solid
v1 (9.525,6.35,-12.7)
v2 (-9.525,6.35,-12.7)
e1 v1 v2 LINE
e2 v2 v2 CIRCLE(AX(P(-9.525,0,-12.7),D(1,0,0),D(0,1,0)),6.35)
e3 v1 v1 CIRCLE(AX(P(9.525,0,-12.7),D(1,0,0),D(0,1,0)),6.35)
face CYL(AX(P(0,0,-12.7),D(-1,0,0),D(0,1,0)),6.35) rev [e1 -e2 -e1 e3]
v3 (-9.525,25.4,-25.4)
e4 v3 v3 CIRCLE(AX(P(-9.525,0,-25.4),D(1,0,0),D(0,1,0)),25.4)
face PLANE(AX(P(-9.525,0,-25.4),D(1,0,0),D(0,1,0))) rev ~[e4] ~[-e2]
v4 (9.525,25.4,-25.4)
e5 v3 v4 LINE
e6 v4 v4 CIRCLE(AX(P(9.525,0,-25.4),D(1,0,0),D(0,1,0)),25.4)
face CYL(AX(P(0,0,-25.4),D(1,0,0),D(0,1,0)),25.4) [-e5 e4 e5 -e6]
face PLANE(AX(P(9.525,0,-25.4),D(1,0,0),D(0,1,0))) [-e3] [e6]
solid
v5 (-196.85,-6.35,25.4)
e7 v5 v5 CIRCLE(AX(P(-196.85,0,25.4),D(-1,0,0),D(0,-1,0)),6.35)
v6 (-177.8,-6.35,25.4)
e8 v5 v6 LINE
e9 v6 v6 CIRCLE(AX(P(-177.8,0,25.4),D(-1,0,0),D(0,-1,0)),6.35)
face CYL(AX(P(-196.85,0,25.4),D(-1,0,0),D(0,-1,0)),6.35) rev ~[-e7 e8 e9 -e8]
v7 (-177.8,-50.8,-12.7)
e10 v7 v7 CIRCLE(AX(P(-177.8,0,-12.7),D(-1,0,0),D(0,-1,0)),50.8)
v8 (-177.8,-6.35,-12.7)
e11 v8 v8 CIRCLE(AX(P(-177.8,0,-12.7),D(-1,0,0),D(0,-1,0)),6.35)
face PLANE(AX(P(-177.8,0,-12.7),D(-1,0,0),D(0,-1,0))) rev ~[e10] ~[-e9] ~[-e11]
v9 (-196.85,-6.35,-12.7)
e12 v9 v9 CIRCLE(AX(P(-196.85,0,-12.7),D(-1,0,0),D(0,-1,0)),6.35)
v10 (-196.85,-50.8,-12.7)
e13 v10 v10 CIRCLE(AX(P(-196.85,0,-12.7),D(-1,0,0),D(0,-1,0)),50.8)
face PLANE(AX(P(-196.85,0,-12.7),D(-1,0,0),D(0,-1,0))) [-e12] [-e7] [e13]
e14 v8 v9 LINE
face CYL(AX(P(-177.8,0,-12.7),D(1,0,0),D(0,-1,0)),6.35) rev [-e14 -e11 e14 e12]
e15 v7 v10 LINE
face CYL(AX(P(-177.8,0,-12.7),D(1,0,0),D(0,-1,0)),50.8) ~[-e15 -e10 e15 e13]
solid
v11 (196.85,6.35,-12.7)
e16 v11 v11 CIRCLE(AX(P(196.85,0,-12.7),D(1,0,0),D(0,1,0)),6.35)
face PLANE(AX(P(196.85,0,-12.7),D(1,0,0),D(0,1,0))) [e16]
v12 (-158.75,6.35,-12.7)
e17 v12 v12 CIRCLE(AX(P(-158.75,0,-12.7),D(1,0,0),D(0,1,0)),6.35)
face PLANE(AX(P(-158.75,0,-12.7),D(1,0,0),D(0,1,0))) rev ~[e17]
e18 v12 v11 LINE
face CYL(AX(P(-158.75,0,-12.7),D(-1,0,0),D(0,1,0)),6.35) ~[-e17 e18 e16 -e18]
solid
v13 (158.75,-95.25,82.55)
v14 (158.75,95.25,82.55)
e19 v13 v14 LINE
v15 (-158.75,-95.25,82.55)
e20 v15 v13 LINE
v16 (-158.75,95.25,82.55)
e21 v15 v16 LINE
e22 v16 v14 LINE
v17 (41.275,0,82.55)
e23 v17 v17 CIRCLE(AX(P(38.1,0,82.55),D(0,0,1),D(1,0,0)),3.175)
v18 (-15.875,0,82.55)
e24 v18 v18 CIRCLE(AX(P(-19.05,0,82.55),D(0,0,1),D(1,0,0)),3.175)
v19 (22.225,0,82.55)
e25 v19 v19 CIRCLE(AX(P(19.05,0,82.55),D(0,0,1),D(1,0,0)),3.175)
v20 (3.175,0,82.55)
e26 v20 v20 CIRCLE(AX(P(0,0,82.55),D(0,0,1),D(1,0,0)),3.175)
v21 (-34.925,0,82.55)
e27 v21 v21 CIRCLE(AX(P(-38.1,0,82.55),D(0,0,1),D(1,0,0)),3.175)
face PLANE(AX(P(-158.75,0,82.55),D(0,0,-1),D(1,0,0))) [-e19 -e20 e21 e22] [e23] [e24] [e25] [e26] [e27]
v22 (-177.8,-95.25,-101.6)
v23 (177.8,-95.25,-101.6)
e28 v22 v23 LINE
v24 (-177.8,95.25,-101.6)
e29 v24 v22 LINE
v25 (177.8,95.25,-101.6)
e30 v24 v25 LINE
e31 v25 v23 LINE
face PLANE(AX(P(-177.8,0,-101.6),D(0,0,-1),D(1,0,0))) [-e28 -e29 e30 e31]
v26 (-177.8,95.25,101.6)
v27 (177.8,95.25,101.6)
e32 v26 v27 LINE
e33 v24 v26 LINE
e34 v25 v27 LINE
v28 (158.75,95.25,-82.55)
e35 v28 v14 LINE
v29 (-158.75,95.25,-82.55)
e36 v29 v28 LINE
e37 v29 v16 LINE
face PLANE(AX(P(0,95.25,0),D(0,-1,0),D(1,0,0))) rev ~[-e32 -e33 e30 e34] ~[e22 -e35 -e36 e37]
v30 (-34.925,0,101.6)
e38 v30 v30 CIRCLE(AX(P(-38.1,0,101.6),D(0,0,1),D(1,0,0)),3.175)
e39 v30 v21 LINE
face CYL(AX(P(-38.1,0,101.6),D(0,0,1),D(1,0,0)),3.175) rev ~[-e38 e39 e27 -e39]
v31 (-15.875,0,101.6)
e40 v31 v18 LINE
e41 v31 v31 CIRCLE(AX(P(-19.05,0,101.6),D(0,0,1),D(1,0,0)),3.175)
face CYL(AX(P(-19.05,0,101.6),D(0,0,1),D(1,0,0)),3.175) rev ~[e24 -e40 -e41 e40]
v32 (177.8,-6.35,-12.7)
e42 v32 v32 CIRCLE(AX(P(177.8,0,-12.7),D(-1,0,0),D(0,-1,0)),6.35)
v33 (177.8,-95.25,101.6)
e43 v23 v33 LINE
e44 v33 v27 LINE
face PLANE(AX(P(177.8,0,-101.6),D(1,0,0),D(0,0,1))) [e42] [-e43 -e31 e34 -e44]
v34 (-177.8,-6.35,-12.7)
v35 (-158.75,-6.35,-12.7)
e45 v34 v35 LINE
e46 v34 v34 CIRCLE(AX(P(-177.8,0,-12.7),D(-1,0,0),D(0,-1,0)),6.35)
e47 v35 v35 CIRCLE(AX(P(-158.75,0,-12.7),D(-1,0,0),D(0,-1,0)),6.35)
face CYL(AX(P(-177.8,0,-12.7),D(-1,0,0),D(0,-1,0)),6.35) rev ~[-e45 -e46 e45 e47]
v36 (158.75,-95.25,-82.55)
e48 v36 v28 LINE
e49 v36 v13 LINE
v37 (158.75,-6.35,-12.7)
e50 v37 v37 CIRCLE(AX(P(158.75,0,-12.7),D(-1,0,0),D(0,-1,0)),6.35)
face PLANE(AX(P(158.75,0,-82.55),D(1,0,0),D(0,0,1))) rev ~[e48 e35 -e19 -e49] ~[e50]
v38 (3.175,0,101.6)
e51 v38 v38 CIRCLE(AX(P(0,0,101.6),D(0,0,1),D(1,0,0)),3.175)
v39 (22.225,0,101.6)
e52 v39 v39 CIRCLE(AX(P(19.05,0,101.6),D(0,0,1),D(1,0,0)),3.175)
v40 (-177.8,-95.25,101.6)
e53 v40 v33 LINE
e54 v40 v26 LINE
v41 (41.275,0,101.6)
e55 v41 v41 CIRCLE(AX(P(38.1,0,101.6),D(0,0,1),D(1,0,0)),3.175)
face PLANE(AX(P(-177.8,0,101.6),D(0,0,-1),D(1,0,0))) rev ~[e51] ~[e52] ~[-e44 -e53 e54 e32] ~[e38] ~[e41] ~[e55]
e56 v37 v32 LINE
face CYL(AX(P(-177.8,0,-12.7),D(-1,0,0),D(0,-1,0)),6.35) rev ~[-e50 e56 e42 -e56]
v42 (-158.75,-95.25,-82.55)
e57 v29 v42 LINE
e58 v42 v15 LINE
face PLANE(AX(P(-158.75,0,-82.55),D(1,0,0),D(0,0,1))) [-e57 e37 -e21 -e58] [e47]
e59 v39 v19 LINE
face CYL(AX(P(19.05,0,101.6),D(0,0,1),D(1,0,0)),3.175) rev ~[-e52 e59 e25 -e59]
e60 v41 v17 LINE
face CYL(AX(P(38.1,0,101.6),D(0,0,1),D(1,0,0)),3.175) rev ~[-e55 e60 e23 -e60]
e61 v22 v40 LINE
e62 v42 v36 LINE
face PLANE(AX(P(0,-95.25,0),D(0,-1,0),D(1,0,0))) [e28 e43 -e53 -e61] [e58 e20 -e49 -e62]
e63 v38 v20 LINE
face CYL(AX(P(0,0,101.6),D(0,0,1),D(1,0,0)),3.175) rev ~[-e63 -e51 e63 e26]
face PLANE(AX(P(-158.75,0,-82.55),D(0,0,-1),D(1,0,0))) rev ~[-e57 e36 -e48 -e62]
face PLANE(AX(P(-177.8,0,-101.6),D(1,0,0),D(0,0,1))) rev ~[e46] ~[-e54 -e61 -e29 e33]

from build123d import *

# Parameters (mm, degrees)
F0_W      = 355.6
F0_H      = 203.2
F0_W_2    = 317.5
F0_H_2    = 165.1
F1_DEPTH  = 95.25
F2_R      = 6.35
F3_DEPTH  = 355.601
F4_R      = 50.8
F4_R_2    = 6.35
F5_DEPTH  = 19.05
F6_R      = 6.35
F7_DEPTH  = 19.05
F9_R      = 6.35
F10_DEPTH = 355.6
F11_R     = 25.4
F11_R_2   = 6.35
F12_DEPTH = 9.525
F13_R     = 3.175
F14_DEPTH = 19.05


# Not quite as in the source:
# - the program builds the solid bodies; features that only make, move or delete a surface that nothing else refers to are left out


with BuildPart() as f1:
    # F0 (on Front) → F1 (new body, symmetric)
    with BuildSketch(Plane.XZ):
        Rectangle(F0_W, F0_H)
        Rectangle(F0_W_2, F0_H_2, mode=Mode.SUBTRACT)
    extrude(amount=F1_DEPTH, both=True)

    # F2 (on face) → F3 (cut, through all)
    with BuildSketch(Plane(origin=(-177.8, 0, 0), x_dir=(0, -1, 0), z_dir=(-1, 0, 0))):
        with Locations((0, -12.7)):
            Circle(F2_R)
    extrude(amount=-F3_DEPTH, mode=Mode.SUBTRACT)

    # F13 (on face) → F14 (cut, through all)
    with BuildSketch(Plane.XY.offset(101.6)):
        with Locations((-38.1, 0)):
            Circle(F13_R)
        with Locations((-19.05, 0)):
            Circle(F13_R)
        Circle(F13_R)
        with Locations((19.05, 0)):
            Circle(F13_R)
        with Locations((38.1, 0)):
            Circle(F13_R)
    extrude(amount=-F14_DEPTH, mode=Mode.SUBTRACT)


with BuildPart() as f5:
    # F4 (on face) → F5 (new body)
    with BuildSketch(Plane(origin=(-177.8, 0, 0), x_dir=(0, -1, 0), z_dir=(-1, 0, 0))):
        with Locations((0, -12.7)):
            Circle(F4_R)
        with Locations((0, -12.7)):
            Circle(F4_R_2, mode=Mode.SUBTRACT)
    extrude(amount=F5_DEPTH)

    # F6 (on face) → F7 (cut, through all)
    with BuildSketch(Plane(origin=(-196.85, 0, 0), x_dir=(0, -1, 0), z_dir=(-1, 0, 0))):
        with Locations((0, 25.4)):
            Circle(F6_R)
    extrude(amount=-F7_DEPTH, mode=Mode.SUBTRACT)


with BuildPart() as f10:
    # F9 (on face) → F10 (new body)
    with BuildSketch(Plane.YZ.offset(-158.75)):
        with Locations((0, -12.7)):
            Circle(F9_R)
    extrude(amount=F10_DEPTH)


with BuildPart() as f12:
    # F11 (on Right) → F12 (new body, symmetric)
    with BuildSketch(Plane.YZ):
        with Locations((0, -25.4)):
            Circle(F11_R)
        with Locations((0, -12.7)):
            Circle(F11_R_2, mode=Mode.SUBTRACT)
    extrude(amount=F12_DEPTH, both=True)


solid = Compound([f1.part, f5.part, f10.part, f12.part])
